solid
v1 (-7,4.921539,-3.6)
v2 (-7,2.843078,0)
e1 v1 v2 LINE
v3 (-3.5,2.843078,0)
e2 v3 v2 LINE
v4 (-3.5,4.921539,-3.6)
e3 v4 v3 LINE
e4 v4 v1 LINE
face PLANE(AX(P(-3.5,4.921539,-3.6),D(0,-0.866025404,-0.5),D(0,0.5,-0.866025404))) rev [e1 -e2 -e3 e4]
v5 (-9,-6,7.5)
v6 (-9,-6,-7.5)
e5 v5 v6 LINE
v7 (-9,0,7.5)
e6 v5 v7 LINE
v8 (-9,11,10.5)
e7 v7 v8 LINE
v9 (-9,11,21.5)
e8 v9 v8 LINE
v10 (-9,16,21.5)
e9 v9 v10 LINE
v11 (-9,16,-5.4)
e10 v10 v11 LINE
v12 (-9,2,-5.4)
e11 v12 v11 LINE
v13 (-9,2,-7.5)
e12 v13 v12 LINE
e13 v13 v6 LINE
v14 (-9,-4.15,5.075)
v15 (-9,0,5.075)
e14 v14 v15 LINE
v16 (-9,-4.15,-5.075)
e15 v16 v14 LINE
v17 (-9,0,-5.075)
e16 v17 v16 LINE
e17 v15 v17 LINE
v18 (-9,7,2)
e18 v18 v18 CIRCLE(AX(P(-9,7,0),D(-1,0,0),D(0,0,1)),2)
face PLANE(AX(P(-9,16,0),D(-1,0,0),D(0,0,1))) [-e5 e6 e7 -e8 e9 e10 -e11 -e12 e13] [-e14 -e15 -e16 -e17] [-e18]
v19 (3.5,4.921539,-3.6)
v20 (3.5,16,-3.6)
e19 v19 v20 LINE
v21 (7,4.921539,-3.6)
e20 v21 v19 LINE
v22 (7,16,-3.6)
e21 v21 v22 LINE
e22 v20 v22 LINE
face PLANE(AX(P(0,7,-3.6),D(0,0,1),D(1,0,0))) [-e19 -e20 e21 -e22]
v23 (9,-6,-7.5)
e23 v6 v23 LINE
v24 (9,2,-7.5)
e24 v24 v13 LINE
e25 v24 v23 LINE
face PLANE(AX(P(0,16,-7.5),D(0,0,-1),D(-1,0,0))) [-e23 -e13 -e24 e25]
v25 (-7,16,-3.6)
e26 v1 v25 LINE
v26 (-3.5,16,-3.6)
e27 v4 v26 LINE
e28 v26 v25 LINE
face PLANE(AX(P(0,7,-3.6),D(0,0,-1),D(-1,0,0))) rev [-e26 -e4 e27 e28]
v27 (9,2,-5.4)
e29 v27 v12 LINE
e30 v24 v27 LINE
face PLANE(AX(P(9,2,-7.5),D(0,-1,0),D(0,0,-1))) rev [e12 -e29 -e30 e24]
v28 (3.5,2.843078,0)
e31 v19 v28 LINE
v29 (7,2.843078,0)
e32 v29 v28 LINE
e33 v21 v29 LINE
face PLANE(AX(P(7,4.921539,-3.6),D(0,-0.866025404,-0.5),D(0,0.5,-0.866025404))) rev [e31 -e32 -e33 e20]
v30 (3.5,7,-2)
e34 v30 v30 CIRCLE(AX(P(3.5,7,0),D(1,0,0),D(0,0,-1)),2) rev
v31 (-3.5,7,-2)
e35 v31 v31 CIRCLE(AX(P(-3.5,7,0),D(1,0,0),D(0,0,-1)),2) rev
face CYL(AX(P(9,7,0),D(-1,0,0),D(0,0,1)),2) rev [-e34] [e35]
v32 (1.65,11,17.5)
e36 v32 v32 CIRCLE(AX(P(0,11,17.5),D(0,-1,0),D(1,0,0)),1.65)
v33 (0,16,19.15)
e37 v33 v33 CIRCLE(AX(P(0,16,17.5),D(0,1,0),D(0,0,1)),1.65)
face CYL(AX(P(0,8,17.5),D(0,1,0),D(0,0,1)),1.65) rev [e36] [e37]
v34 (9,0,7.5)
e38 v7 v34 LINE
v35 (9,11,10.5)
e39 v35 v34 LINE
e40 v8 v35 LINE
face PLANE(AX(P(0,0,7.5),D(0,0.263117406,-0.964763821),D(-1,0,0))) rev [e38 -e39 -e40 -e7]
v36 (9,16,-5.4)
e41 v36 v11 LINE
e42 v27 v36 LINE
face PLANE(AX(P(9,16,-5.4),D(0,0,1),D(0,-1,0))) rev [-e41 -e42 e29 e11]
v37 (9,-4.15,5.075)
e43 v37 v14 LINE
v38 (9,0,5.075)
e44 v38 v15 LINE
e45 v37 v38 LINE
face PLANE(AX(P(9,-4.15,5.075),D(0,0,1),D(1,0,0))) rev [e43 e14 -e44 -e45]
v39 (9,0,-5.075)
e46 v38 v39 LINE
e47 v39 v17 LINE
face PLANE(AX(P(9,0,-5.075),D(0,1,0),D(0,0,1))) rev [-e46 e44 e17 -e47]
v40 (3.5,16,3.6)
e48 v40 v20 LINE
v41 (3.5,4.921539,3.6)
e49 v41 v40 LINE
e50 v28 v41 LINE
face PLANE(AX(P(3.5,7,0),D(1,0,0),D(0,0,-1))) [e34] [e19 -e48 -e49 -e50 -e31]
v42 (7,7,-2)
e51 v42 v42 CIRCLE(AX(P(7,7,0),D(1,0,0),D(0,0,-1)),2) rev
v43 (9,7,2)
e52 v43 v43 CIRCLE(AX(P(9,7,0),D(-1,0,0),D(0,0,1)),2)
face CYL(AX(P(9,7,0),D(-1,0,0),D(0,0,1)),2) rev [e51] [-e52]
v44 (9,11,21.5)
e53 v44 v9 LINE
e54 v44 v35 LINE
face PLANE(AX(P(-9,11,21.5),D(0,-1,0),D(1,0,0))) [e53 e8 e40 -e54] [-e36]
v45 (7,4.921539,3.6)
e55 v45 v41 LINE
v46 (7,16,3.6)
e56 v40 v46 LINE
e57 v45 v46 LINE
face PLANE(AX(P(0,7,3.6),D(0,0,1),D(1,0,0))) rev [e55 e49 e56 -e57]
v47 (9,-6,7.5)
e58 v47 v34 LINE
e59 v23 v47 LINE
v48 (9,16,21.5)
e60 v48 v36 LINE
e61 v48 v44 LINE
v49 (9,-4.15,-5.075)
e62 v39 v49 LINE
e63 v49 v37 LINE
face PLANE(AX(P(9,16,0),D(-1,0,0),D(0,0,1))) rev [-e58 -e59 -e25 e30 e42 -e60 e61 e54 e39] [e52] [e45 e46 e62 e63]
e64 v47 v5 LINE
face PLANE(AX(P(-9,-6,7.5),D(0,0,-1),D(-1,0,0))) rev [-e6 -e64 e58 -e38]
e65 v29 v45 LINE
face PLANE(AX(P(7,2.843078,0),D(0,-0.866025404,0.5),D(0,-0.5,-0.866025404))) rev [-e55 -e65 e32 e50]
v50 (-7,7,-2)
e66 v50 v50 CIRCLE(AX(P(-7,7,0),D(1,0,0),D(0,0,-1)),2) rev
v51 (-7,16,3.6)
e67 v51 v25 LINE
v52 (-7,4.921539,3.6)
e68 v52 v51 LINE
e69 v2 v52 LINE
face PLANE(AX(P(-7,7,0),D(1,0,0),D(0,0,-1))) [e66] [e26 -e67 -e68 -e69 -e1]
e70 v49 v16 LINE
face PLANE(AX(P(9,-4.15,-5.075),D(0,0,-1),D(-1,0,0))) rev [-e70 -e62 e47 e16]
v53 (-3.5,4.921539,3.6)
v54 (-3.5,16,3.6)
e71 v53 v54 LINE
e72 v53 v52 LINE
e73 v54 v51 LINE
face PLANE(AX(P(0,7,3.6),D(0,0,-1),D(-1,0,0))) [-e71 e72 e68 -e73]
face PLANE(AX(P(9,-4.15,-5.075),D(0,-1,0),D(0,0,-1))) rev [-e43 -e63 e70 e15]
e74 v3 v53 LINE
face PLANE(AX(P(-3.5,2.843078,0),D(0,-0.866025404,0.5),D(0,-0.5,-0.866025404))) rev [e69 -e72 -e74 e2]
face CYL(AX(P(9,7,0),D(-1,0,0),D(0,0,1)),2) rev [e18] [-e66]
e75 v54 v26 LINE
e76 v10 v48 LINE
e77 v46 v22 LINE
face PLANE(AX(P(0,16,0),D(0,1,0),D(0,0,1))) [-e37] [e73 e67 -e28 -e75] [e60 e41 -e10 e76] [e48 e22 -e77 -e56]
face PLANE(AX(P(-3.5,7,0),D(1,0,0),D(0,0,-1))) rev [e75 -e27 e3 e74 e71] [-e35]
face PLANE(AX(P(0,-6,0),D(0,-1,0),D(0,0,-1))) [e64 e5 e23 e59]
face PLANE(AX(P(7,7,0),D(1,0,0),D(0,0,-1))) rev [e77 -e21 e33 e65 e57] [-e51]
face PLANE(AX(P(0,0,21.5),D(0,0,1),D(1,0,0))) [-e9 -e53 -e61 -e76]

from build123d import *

# Parameters (mm, degrees)
IZIM1_W                     = 18
IZIM1_H                     = 15
Y_KSEKLIK_EKSTR_ZYON1_DEPTH = 16
IZIM4_R                     = 2
KES_EKSTR_ZYON3_DEPTH       = 26.223996511
IZIM5_W                     = 3.5
IZIM5_H                     = 7.2
KES_EKSTR_ZYON4_DEPTH       = 9
KES_EKSTR_ZYON6_DEPTH       = 1.75
KES_EKSTR_ZYON14_DEPTH      = 1.75
IZIM11_W                    = 18
IZIM11_H                    = 5
MAKAS_DELI_I_DEPTH          = 14
IZIM12_R                    = 1.65
KES_EKSTR_ZYON10_DEPTH      = 8
PAH1_SIZE                   = 11
PAH1_SIZE_2                 = 3
IZIM15_W                    = 18
IZIM15_H                    = 15
ALT_SLOT_DEPTH              = 6
IZIM16_W                    = 10.15
IZIM16_H                    = 4.15
IZIM16_W_2                  = 2.1
IZIM16_H_2                  = 14
KES_EKSTR_ZYON15_DEPTH      = 33.283896915


with BuildPart() as part:
    # Çizim1 → Yükseklik-Ekstrüzyon1 (new body)
    with BuildSketch(Plane(origin=(0, 0, 0), x_dir=(1, 0, 0), z_dir=(0, 1, 0))):
        Rectangle(IZIM1_W, IZIM1_H)
    extrude(amount=Y_KSEKLIK_EKSTR_ZYON1_DEPTH)

    # Çizim4 → Kes-Ekstrüzyon3 (cut, through all)
    with BuildSketch(Plane.ZY.offset(9)):
        with Locations((0, 7)):
            Circle(IZIM4_R)
    extrude(amount=-KES_EKSTR_ZYON3_DEPTH, mode=Mode.SUBTRACT)

    # Çizim5 → Kes-Ekstrüzyon4 (cut)
    with BuildSketch(Plane(origin=(0, 16, 0), x_dir=(1, 0, 0), z_dir=(0, 1, 0))):
        with Locations((5.25, 0)):
            Rectangle(IZIM5_W, IZIM5_H)
        with Locations((-5.25, 0)):
            Rectangle(IZIM5_W, IZIM5_H)
    extrude(amount=-KES_EKSTR_ZYON4_DEPTH, mode=Mode.SUBTRACT)

    # Çizim6 → Kes-Ekstrüzyon6 (cut, symmetric)
    with BuildSketch(Plane.ZY.offset(-5.25)):
        Polygon((3.6, 9.078460969), (0, 11.156921938), (-3.6, 9.078460969), (-3.6, 4.921539031), (0, 2.843078062), (3.6, 4.921539031), align=None)
    extrude(amount=KES_EKSTR_ZYON6_DEPTH, both=True, mode=Mode.SUBTRACT)

    # Çizim14 → Kes-Ekstrüzyon14 (cut, symmetric)
    with BuildSketch(Plane.ZY.offset(5.25)):
        Polygon((3.6, 9.078460969), (0, 11.156921938), (-3.6, 9.078460969), (-3.6, 4.921539031), (0, 2.843078062), (3.6, 4.921539031), align=None)
    extrude(amount=KES_EKSTR_ZYON14_DEPTH, both=True, mode=Mode.SUBTRACT)

    # Çizim11 → makas deliği (add)
    with BuildSketch(Plane(origin=(0, 0, 7.5), x_dir=(-1, 0, 0), z_dir=(0, 0, -1))):
        with Locations((0, 13.5)):
            Rectangle(IZIM11_W, IZIM11_H)
    extrude(amount=-MAKAS_DELI_I_DEPTH)

    # Çizim12 → Kes-Ekstrüzyon10 (cut)
    with BuildSketch(Plane(origin=(0, 16, 0), x_dir=(1, 0, 0), z_dir=(0, 1, 0))):
        with Locations(Location((0, -17.5, 0), (0, 0, 270))):
            Circle(IZIM12_R)
    extrude(amount=-KES_EKSTR_ZYON10_DEPTH, mode=Mode.SUBTRACT)

    # Pah1
    # the kernel refuses this chamfer: 11, 3 mm, written as the material it adds along each edge
    with BuildSketch(Plane(origin=(9, 11, 7.5), x_dir=(0, -0.9999486586881362, -0.010133113430599267), z_dir=(-1, 0, 0))) as pah1_piece_1_section:
        Polygon((PAH1_SIZE * 0.999948658688, PAH1_SIZE * 0.0101331134306), (-PAH1_SIZE_2 * 0.0101331134306, PAH1_SIZE_2 * 0.999948658688), (0, 0), align=None)
    pah1_piece_1 = extrude(amount=18, mode=Mode.PRIVATE)
    pah1_piece_1 = split(pah1_piece_1, bisect_by=Plane(origin=(0, 0, 8.392972415), z_dir=(0, 1, 0)), keep=Keep.TOP, mode=Mode.PRIVATE)
    add(pah1_piece_1)

    # Çizim15 → alt slot (add)
    with BuildSketch(Plane.XZ):
        Rectangle(IZIM15_W, IZIM15_H)
    extrude(amount=ALT_SLOT_DEPTH)

    # Çizim16 → Kes-Ekstrüzyon15 (cut, through all)
    with BuildSketch(Plane.ZY.offset(9)):
        with Locations((0, -2.075)):
            Rectangle(IZIM16_W, IZIM16_H)
        with Locations((-6.45, 9)):
            Rectangle(IZIM16_W_2, IZIM16_H_2)
    extrude(amount=-KES_EKSTR_ZYON15_DEPTH, mode=Mode.SUBTRACT)


solid = part.part
